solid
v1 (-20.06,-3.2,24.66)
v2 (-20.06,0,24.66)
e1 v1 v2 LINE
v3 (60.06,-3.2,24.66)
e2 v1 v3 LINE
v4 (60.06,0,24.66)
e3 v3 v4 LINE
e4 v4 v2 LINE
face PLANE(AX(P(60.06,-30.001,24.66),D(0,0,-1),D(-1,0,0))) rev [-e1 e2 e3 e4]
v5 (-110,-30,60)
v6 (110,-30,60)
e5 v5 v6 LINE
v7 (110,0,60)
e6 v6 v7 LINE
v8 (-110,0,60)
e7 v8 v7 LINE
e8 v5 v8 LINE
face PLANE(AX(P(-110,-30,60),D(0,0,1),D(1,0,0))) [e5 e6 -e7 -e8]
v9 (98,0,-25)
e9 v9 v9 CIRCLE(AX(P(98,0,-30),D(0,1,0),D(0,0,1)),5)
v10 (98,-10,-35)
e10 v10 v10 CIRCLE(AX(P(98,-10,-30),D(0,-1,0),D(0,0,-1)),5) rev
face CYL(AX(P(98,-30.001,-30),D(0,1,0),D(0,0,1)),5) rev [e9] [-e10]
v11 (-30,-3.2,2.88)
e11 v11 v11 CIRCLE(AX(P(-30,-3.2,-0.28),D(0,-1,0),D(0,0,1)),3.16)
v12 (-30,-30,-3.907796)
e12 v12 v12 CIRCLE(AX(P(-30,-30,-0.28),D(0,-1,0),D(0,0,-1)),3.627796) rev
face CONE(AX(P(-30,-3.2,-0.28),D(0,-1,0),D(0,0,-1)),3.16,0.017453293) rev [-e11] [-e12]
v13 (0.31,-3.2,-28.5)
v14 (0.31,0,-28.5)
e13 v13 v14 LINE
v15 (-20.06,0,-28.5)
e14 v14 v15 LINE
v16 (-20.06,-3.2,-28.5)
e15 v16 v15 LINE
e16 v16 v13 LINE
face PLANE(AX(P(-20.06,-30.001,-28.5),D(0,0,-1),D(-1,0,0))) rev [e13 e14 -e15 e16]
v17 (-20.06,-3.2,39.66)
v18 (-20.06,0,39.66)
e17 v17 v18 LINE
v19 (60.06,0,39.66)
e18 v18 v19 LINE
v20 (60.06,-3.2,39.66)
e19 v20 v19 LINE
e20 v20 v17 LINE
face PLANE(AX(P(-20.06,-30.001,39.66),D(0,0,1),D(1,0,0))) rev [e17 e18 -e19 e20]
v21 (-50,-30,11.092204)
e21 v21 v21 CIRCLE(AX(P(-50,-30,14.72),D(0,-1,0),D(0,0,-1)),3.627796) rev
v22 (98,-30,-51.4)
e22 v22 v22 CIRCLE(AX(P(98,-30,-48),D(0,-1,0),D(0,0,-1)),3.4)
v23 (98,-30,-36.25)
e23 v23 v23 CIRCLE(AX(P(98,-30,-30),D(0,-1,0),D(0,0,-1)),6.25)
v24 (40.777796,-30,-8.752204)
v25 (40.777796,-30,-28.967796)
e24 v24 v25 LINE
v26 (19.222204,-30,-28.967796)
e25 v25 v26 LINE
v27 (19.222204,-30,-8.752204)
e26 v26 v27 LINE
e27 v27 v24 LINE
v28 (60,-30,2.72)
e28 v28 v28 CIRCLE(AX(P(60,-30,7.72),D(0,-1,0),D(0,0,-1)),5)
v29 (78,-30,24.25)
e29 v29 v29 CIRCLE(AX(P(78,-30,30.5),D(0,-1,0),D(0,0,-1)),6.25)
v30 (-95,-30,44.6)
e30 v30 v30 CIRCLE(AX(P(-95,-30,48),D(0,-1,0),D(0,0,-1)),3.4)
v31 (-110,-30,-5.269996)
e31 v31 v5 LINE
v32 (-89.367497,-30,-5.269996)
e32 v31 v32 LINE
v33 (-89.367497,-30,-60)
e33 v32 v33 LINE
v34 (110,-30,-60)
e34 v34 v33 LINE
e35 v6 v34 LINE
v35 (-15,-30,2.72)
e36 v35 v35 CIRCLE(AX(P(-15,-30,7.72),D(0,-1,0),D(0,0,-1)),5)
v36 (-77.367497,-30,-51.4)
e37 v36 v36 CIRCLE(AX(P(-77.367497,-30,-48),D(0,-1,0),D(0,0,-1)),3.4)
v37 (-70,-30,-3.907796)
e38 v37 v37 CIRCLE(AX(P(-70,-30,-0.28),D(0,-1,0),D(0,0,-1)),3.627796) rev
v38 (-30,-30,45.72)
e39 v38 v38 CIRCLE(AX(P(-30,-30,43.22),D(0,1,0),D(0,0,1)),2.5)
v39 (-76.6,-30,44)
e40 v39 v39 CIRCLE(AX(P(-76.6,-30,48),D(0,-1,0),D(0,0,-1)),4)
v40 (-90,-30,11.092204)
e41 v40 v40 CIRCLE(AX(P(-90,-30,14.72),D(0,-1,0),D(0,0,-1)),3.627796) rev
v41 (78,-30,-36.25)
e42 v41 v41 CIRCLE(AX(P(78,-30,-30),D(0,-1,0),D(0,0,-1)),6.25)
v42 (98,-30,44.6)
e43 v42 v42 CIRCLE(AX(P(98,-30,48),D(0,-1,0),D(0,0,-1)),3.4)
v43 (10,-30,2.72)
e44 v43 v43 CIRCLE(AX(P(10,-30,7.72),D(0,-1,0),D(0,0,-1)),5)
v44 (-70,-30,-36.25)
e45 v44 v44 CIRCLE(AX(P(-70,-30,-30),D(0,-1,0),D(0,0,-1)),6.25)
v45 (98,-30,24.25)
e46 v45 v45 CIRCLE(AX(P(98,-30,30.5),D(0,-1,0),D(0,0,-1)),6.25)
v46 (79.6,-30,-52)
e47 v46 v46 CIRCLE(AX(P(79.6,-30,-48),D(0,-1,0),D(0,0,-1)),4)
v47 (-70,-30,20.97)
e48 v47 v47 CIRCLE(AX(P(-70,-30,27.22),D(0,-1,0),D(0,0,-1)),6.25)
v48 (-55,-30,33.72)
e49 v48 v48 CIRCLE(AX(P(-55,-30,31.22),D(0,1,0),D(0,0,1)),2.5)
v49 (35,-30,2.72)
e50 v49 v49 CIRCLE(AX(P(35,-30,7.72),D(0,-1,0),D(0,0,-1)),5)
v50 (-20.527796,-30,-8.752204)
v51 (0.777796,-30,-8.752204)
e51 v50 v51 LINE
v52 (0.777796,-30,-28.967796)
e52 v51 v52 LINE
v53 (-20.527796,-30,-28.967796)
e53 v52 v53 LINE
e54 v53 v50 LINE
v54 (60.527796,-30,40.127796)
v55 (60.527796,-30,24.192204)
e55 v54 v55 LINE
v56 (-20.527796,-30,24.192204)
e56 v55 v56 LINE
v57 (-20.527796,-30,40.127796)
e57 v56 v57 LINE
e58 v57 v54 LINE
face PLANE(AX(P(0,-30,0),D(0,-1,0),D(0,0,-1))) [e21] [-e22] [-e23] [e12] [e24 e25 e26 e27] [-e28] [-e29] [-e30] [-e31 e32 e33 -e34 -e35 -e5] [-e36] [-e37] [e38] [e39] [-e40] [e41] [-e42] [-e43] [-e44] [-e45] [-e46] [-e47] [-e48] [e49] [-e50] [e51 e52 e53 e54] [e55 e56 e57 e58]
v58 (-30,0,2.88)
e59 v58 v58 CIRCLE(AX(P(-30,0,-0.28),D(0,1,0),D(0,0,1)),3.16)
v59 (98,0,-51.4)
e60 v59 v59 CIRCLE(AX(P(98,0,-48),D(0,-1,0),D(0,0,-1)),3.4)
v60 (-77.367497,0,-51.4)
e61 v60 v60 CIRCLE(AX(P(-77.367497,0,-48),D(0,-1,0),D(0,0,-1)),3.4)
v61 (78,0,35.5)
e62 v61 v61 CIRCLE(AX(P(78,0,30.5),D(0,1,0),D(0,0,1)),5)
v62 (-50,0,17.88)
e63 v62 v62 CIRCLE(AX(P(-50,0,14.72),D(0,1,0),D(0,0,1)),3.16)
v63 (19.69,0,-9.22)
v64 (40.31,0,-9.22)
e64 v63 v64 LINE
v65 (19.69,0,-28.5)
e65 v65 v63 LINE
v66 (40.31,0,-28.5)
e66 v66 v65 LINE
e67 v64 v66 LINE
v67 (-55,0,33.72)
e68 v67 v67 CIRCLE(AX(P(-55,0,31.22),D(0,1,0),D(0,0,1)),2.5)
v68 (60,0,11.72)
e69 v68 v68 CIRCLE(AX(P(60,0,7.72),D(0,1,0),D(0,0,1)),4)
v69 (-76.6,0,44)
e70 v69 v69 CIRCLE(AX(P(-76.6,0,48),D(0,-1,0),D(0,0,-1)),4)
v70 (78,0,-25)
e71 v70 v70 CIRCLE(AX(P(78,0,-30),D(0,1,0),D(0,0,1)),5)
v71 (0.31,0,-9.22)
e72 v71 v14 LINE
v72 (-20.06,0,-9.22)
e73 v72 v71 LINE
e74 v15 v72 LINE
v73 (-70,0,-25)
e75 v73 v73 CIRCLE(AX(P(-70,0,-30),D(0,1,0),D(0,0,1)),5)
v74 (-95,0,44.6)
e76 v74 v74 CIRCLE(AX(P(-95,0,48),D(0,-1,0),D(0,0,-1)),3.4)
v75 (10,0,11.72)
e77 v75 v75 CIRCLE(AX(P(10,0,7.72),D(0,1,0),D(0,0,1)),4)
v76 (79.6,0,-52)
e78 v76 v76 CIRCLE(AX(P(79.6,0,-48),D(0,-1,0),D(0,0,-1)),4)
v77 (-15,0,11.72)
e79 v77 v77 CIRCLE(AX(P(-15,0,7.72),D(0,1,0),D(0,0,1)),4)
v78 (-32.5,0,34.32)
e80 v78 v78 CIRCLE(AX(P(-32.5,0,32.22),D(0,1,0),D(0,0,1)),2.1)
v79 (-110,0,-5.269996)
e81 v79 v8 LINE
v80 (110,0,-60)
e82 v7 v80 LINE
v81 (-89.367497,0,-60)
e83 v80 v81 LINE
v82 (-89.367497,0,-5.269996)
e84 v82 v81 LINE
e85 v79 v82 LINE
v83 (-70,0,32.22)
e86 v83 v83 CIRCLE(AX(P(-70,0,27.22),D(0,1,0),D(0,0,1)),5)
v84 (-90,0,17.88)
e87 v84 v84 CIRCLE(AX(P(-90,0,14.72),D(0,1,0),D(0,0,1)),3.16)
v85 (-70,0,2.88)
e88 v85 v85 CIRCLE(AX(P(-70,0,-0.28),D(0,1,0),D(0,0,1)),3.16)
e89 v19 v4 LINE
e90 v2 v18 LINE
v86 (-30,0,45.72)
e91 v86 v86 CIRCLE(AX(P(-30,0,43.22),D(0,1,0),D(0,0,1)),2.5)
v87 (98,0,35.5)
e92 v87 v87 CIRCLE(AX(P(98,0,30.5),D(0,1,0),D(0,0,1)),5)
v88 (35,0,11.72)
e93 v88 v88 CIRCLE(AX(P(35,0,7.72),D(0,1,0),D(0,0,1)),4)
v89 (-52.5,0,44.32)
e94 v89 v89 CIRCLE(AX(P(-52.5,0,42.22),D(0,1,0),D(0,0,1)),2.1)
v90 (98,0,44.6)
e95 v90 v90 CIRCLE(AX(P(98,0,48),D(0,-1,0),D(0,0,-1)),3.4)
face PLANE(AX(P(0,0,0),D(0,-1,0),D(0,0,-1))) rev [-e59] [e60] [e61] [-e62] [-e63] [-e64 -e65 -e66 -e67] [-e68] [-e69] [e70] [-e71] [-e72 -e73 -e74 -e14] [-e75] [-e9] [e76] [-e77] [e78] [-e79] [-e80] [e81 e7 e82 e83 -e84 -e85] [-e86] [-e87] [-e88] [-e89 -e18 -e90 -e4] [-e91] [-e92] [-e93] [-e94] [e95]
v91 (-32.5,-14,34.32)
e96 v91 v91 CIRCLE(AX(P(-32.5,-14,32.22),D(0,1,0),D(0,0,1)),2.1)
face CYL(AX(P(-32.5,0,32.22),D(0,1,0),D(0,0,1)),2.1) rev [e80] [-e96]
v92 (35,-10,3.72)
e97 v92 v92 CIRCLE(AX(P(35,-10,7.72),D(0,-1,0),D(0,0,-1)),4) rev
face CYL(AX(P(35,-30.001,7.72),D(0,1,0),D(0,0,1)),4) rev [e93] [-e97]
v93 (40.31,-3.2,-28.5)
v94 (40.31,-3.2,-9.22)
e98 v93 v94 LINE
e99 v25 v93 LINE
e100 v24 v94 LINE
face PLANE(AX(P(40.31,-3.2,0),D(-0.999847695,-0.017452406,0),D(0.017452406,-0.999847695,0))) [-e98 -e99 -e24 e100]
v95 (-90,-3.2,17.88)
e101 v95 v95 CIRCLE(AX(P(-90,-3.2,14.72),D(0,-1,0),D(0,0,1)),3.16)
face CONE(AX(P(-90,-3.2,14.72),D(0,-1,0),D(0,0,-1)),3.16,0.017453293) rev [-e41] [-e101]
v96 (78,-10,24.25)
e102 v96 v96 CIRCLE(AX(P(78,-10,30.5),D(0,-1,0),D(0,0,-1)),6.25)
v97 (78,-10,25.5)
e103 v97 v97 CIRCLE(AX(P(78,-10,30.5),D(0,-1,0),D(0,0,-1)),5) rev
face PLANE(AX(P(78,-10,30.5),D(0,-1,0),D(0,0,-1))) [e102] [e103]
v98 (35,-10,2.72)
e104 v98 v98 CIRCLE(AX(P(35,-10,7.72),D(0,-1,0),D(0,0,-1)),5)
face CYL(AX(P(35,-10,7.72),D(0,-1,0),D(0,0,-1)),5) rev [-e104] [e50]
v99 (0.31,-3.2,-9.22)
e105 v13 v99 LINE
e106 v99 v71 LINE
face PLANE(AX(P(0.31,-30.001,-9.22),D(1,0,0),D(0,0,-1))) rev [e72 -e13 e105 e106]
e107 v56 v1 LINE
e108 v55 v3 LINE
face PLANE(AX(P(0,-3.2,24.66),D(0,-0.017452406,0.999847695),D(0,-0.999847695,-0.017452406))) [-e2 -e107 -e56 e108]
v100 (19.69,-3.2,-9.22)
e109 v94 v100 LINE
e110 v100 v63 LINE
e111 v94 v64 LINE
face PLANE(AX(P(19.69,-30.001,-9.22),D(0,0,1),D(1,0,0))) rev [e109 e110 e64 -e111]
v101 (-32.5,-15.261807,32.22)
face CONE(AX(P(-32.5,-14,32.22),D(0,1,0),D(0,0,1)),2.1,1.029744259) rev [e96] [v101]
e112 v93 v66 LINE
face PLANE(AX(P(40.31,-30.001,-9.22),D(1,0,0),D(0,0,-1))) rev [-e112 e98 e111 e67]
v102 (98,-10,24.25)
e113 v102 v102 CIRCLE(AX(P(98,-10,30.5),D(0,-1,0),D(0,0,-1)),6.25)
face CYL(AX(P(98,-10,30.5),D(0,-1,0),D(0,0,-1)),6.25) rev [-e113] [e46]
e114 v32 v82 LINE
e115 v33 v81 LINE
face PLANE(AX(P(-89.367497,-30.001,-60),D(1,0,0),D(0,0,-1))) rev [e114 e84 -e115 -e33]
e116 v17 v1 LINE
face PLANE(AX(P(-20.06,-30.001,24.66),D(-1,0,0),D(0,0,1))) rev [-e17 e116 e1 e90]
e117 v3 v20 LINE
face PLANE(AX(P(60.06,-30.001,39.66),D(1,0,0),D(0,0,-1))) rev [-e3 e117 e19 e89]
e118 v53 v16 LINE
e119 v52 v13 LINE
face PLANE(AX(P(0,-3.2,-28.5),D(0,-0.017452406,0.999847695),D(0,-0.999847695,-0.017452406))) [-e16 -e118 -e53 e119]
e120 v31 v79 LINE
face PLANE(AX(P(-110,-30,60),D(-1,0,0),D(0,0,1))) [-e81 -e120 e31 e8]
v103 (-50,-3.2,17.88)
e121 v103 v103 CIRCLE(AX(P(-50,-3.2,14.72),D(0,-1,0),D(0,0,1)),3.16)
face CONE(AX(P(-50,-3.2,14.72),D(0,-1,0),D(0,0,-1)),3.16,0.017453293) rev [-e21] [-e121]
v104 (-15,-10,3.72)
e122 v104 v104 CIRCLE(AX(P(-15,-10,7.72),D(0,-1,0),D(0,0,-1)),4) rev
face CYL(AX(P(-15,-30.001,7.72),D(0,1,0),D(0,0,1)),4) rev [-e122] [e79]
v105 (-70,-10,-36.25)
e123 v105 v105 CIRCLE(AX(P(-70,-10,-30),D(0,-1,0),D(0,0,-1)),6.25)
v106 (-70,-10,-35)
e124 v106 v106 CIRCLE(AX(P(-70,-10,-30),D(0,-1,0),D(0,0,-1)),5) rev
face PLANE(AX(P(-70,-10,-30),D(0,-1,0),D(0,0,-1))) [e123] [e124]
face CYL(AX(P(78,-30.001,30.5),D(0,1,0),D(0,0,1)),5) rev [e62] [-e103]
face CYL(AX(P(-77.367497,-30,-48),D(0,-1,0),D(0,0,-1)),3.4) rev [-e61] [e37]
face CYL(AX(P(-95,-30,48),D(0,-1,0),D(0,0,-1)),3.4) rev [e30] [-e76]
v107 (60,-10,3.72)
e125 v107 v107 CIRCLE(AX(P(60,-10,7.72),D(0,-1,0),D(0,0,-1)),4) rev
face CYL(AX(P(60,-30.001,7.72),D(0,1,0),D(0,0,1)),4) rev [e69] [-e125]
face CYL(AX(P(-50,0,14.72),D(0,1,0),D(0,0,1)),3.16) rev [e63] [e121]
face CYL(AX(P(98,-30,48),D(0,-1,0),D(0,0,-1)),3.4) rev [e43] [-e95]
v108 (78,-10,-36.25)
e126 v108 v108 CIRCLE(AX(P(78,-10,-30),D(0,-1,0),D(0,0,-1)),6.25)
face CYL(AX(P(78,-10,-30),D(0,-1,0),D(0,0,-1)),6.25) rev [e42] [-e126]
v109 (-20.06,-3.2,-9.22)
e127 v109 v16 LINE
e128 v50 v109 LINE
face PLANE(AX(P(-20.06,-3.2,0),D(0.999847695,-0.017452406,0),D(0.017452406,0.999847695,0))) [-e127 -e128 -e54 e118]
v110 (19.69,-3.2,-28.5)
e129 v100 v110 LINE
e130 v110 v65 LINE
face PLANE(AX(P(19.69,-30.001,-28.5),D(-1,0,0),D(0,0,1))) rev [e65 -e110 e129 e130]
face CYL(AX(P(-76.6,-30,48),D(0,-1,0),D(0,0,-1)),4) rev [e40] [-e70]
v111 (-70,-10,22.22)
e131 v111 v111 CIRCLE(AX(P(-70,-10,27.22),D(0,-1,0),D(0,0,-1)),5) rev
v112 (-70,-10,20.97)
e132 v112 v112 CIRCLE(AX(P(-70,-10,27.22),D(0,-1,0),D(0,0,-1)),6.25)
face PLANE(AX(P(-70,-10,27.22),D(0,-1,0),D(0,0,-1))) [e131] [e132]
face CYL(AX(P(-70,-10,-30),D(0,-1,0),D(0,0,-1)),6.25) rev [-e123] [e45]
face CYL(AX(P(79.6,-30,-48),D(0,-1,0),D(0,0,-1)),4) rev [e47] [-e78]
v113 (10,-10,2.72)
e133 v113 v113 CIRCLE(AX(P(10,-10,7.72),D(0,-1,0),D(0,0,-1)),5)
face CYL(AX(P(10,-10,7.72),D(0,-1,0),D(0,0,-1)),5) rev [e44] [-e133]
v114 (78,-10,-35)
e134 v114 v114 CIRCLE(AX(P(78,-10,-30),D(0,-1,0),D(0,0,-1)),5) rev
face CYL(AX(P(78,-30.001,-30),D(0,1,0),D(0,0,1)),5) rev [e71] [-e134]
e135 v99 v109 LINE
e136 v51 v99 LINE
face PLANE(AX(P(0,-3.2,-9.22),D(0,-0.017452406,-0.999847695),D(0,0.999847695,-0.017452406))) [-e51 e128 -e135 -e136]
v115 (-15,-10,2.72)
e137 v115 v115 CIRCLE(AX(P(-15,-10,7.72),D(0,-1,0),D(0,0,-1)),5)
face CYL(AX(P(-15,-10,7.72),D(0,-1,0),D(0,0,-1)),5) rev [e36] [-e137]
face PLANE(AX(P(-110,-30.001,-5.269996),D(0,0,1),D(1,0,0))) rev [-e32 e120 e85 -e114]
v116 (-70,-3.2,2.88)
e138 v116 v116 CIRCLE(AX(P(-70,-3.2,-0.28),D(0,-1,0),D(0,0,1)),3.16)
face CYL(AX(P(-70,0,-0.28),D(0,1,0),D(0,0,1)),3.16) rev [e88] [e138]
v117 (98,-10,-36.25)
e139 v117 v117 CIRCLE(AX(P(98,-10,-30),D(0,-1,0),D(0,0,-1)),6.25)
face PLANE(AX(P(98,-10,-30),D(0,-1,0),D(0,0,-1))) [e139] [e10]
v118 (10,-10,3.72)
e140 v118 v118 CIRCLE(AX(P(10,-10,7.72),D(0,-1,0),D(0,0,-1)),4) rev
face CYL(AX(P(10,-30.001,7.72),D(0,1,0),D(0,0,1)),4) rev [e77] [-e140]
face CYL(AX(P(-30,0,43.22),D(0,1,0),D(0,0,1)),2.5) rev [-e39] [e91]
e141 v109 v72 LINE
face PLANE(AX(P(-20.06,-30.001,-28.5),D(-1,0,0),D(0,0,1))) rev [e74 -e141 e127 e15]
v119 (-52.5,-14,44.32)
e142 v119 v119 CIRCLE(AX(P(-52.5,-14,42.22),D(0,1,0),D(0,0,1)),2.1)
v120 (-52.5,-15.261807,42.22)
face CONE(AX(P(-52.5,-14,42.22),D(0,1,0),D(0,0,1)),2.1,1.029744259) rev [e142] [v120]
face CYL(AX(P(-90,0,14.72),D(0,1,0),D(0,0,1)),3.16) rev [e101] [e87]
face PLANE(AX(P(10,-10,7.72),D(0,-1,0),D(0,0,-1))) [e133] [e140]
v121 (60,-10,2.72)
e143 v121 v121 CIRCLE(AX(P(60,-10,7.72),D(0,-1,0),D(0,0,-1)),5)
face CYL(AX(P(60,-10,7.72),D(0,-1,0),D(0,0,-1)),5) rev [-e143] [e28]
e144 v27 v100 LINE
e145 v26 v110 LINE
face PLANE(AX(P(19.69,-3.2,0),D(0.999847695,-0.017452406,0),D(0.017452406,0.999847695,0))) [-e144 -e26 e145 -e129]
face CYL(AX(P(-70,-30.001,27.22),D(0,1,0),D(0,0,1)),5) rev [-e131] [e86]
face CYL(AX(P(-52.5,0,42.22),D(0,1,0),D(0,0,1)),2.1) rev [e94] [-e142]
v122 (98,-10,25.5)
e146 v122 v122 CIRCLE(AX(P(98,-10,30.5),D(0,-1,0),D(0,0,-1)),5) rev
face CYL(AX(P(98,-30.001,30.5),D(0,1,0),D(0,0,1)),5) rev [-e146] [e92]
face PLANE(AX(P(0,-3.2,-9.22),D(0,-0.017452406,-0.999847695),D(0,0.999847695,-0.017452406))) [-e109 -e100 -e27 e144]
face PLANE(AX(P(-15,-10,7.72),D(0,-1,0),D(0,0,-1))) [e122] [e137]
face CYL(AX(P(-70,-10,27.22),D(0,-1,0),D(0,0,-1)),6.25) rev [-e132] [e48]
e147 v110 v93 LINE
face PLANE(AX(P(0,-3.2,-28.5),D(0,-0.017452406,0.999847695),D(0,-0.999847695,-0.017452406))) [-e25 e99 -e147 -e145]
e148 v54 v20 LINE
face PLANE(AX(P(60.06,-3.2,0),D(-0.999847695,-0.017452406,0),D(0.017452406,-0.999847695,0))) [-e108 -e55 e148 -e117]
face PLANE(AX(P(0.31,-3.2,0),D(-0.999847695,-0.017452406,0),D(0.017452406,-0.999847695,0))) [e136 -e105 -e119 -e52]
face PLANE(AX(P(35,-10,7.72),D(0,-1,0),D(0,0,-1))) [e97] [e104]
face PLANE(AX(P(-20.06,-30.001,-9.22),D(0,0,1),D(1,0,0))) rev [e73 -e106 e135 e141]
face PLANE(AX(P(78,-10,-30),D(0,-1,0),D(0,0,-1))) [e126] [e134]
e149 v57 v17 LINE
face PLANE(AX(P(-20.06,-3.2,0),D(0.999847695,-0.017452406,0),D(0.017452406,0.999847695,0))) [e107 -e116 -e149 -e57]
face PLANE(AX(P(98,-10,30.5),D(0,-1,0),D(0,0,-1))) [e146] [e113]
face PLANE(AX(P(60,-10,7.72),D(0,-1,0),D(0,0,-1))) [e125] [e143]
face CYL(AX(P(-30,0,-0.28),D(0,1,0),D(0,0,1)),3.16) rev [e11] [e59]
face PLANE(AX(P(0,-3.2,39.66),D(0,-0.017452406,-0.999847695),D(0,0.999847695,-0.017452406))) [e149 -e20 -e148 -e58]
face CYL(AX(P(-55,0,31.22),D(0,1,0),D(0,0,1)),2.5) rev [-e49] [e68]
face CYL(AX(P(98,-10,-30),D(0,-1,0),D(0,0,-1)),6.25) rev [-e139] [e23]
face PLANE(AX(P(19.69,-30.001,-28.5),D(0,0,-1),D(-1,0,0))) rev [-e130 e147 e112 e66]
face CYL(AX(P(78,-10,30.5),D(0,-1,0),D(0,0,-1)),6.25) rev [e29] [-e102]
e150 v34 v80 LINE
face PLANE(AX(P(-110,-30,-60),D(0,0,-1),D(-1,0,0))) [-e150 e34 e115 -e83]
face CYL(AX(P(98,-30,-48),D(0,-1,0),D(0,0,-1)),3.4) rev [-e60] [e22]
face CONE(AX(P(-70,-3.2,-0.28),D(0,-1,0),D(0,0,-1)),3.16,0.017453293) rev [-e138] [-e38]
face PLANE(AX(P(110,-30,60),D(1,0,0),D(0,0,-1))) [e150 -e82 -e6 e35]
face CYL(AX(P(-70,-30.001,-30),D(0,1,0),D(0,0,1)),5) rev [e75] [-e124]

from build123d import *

# Parameters (mm, degrees)
SKETCH1_W                    = 220
SKETCH1_H                    = 120
BOSS_EXTRUDE1_DEPTH          = 30
CUT_EXTRUDE1_REACH           = 130.841
SKETCH2_W                    = 20.632503002
SKETCH2_H                    = 54.730004003
CUT_EXTRUDE3_REACH           = 130.841
SKETCH5_W                    = 20.37
SKETCH5_H                    = 19.28
SKETCH5_W_2                  = 20.62
F_0_15_6_32_DIAMETER_HOLE1_D = 6.32
CUT_EXTRUDE4_REACH           = 130.841
SKETCH10_W                   = 80.12
SKETCH10_H                   = 15
CUT_EXTRUDE5_REACH           = 130.841
SKETCH12_R                   = 5
SKETCH12_R_2                 = 4
SKETCH13_R                   = 6.25
CUT_EXTRUDE6_DEPTH           = 20
SKETCH14_R                   = 5
CUT_EXTRUDE7_DEPTH           = 20
M5_TAPPED_HOLE1_D            = 4.2
M5_TAPPED_HOLE1_DEPTH        = 14
M5_TAPPED_HOLE1_TIP          = 1.2618073
F_5_0MM_DOWEL_HOLE1_D        = 5
M8_TAPPED_HOLE1_D            = 6.8
F_8_0MM_DOWEL_HOLE1_D        = 8


with BuildPart() as part:
    # Sketch1 → Boss-Extrude1 (new body)
    with BuildSketch(Plane(origin=(0, 0, 0), x_dir=(1, 0, 0), z_dir=(0, 1, 0))):
        Rectangle(SKETCH1_W, SKETCH1_H)
    extrude(amount=-BOSS_EXTRUDE1_DEPTH)

    # Sketch2 → Cut-Extrude1 (cut, up to next)
    with BuildSketch(Plane(origin=(0, 0, 0), x_dir=(1, 0, 0), z_dir=(0, 1, 0)), mode=Mode.PRIVATE) as cut_extrude1_sk1:
        with Locations((-99.683748499, 32.634997999)):
            Rectangle(SKETCH2_W, SKETCH2_H)
    cut_extrude1_tool1 = extrude(cut_extrude1_sk1.sketch, amount=-CUT_EXTRUDE1_REACH, mode=Mode.PRIVATE) & part.part
    add(cut_extrude1_tool1.solids().sort_by_distance((-99.683748, 0, -32.634998))[0], mode=Mode.SUBTRACT)

    # Sketch5 → Cut-Extrude3 (cut, up to next)
    with BuildSketch(Plane(origin=(0, 0, 0), x_dir=(1, 0, 0), z_dir=(0, 1, 0)), mode=Mode.PRIVATE) as cut_extrude3_sk1:
        with Locations((-9.875, 18.86)):
            Rectangle(SKETCH5_W, SKETCH5_H)
    cut_extrude3_tool1 = extrude(cut_extrude3_sk1.sketch, amount=-CUT_EXTRUDE3_REACH, mode=Mode.PRIVATE) & part.part
    # Sketch5 → Cut-Extrude3 (cut, up to next)
    with BuildSketch(Plane(origin=(0, 0, 0), x_dir=(1, 0, 0), z_dir=(0, 1, 0)), mode=Mode.PRIVATE) as cut_extrude3_sk2:
        with Locations((30, 18.86)):
            Rectangle(SKETCH5_W_2, SKETCH5_H)
    cut_extrude3_tool2 = extrude(cut_extrude3_sk2.sketch, amount=-CUT_EXTRUDE3_REACH, mode=Mode.PRIVATE) & part.part
    add(cut_extrude3_tool1.solids().sort_by_distance((-9.875, 0, -18.86))[0], mode=Mode.SUBTRACT)
    add(cut_extrude3_tool2.solids().sort_by_distance((30, 0, -18.86))[0], mode=Mode.SUBTRACT)

    # Ø0.15 (6.32) Diameter Hole1 (through all)
    with Locations(Plane(origin=(0, 0, 0), x_dir=(1, 0, 0), z_dir=(0, 1, 0))):
        with Locations((-30, 0.28), (-50, -14.72), (-70, 0.28), (-90, -14.72)):
            Hole(F_0_15_6_32_DIAMETER_HOLE1_D / 2)

    # Sketch10 → Cut-Extrude4 (cut, up to next)
    with BuildSketch(Plane(origin=(0, 0, 0), x_dir=(1, 0, 0), z_dir=(0, 1, 0)), mode=Mode.PRIVATE) as cut_extrude4_sk1:
        with Locations((20, -32.16)):
            Rectangle(SKETCH10_W, SKETCH10_H)
    cut_extrude4_tool1 = extrude(cut_extrude4_sk1.sketch, amount=-CUT_EXTRUDE4_REACH, mode=Mode.PRIVATE) & part.part
    add(cut_extrude4_tool1.solids().sort_by_distance((20, 0, 32.16))[0], mode=Mode.SUBTRACT)

    # Draft1: read off the stored shape, not the designer's step
    # Draft1: loft between two sections, ruled curve by curve
    draft1_from = [
        Edge.make_line((40.31, -3.2, -9.22), (40.31, -3.2, -28.5)),
        Edge.make_line((19.69, -3.2, -9.22), (40.31, -3.2, -9.22)),
        Edge.make_line((19.69, -3.2, -28.5), (19.69, -3.2, -9.22)),
        Edge.make_line((40.31, -3.2, -28.5), (19.69, -3.2, -28.5)),
    ]
    draft1_to = [
        Edge.make_line((40.77779574, -30, -8.75220426), (40.77779574, -30, -28.96779574)),
        Edge.make_line((19.22220426, -30, -8.75220426), (40.77779574, -30, -8.75220426)),
        Edge.make_line((19.22220426, -30, -28.96779574), (19.22220426, -30, -8.75220426)),
        Edge.make_line((40.77779574, -30, -28.96779574), (19.22220426, -30, -28.96779574)),
    ]
    draft1 = Solid(Shell([*[Face.make_surface_from_curves(draft1_from[k], draft1_to[k]) for k in range(4)], Face(Wire(draft1_from)), Face(Wire(draft1_to))]))
    add(draft1, mode=Mode.SUBTRACT)

    # Draft1 2: loft between two sections, ruled curve by curve
    draft1_2_from = [
        Edge.make_line((-20.06, -3.2, -9.22), (0.31, -3.2, -9.22)),
        Edge.make_line((0.31, -3.2, -28.5), (-20.06, -3.2, -28.5)),
        Edge.make_line((0.31, -3.2, -9.22), (0.31, -3.2, -28.5)),
        Edge.make_line((-20.06, -3.2, -28.5), (-20.06, -3.2, -9.22)),
    ]
    draft1_2_to = [
        Edge.make_line((-20.52779574, -30, -8.75220426), (0.77779574, -30, -8.75220426)),
        Edge.make_line((0.77779574, -30, -28.96779574), (-20.52779574, -30, -28.96779574)),
        Edge.make_line((0.77779574, -30, -8.75220426), (0.77779574, -30, -28.96779574)),
        Edge.make_line((-20.52779574, -30, -28.96779574), (-20.52779574, -30, -8.75220426)),
    ]
    draft1_2 = Solid(Shell([*[Face.make_surface_from_curves(draft1_2_from[k], draft1_2_to[k]) for k in range(4)], Face(Wire(draft1_2_from)), Face(Wire(draft1_2_to))]))
    add(draft1_2, mode=Mode.SUBTRACT)

    # Draft1 3: loft between two sections, ruled curve by curve
    draft1_3_from = [
        Edge.make_line((-20.06, -3.2, 24.66), (-20.06, -3.2, 39.66)),
        Edge.make_line((60.06, -3.2, 24.66), (-20.06, -3.2, 24.66)),
        Edge.make_line((60.06, -3.2, 39.66), (60.06, -3.2, 24.66)),
        Edge.make_line((-20.06, -3.2, 39.66), (60.06, -3.2, 39.66)),
    ]
    draft1_3_to = [
        Edge.make_line((-20.52779574, -30, 24.19220426), (-20.52779574, -30, 40.12779574)),
        Edge.make_line((60.52779574, -30, 24.19220426), (-20.52779574, -30, 24.19220426)),
        Edge.make_line((60.52779574, -30, 40.12779574), (60.52779574, -30, 24.19220426)),
        Edge.make_line((-20.52779574, -30, 40.12779574), (60.52779574, -30, 40.12779574)),
    ]
    draft1_3 = Solid(Shell([*[Face.make_surface_from_curves(draft1_3_from[k], draft1_3_to[k]) for k in range(4)], Face(Wire(draft1_3_from)), Face(Wire(draft1_3_to))]))
    add(draft1_3, mode=Mode.SUBTRACT)

    # Draft2: read off the stored shape, not the designer's step
    # Draft2: loft between two sections, ruled curve by curve
    draft2_from = [
        Edge.make_three_point_arc((-90, -3.2, 11.56), (-86.84, -3.2, 14.72), (-90, -3.2, 17.88)),
        Edge.make_three_point_arc((-90, -3.2, 17.88), (-93.16, -3.2, 14.72), (-90, -3.2, 11.56)),
    ]
    draft2_to = [
        Edge.make_three_point_arc((-90, -30, 11.09220426), (-86.37220426, -30, 14.72), (-90, -30, 18.34779574)),
        Edge.make_three_point_arc((-90, -30, 18.34779574), (-93.62779574, -30, 14.72), (-90, -30, 11.09220426)),
    ]
    draft2 = Solid(Shell([*[Face.make_surface_from_curves(draft2_from[k], draft2_to[k]) for k in range(2)], Face(Wire(draft2_from)), Face(Wire(draft2_to))]))
    add(draft2, mode=Mode.SUBTRACT)

    # Draft2 2: loft between two sections, ruled curve by curve
    draft2_2_from = [
        Edge.make_three_point_arc((-70, -3.2, -3.44), (-66.84, -3.2, -0.28), (-70, -3.2, 2.88)),
        Edge.make_three_point_arc((-70, -3.2, 2.88), (-73.16, -3.2, -0.28), (-70, -3.2, -3.44)),
    ]
    draft2_2_to = [
        Edge.make_three_point_arc((-70, -30, -3.90779574), (-66.37220426, -30, -0.28), (-70, -30, 3.34779574)),
        Edge.make_three_point_arc((-70, -30, 3.34779574), (-73.62779574, -30, -0.28), (-70, -30, -3.90779574)),
    ]
    draft2_2 = Solid(Shell([*[Face.make_surface_from_curves(draft2_2_from[k], draft2_2_to[k]) for k in range(2)], Face(Wire(draft2_2_from)), Face(Wire(draft2_2_to))]))
    add(draft2_2, mode=Mode.SUBTRACT)

    # Draft2 3: loft between two sections, ruled curve by curve
    draft2_3_from = [
        Edge.make_three_point_arc((-50, -3.2, 11.56), (-46.84, -3.2, 14.72), (-50, -3.2, 17.88)),
        Edge.make_three_point_arc((-50, -3.2, 17.88), (-53.16, -3.2, 14.72), (-50, -3.2, 11.56)),
    ]
    draft2_3_to = [
        Edge.make_three_point_arc((-50, -30, 11.09220426), (-46.37220426, -30, 14.72), (-50, -30, 18.34779574)),
        Edge.make_three_point_arc((-50, -30, 18.34779574), (-53.62779574, -30, 14.72), (-50, -30, 11.09220426)),
    ]
    draft2_3 = Solid(Shell([*[Face.make_surface_from_curves(draft2_3_from[k], draft2_3_to[k]) for k in range(2)], Face(Wire(draft2_3_from)), Face(Wire(draft2_3_to))]))
    add(draft2_3, mode=Mode.SUBTRACT)

    # Draft2 4: loft between two sections, ruled curve by curve
    draft2_4_from = [
        Edge.make_three_point_arc((-30, -3.2, -3.44), (-26.84, -3.2, -0.28), (-30, -3.2, 2.88)),
        Edge.make_three_point_arc((-30, -3.2, 2.88), (-33.16, -3.2, -0.28), (-30, -3.2, -3.44)),
    ]
    draft2_4_to = [
        Edge.make_three_point_arc((-30, -30, -3.90779574), (-26.37220426, -30, -0.28), (-30, -30, 3.34779574)),
        Edge.make_three_point_arc((-30, -30, 3.34779574), (-33.62779574, -30, -0.28), (-30, -30, -3.90779574)),
    ]
    draft2_4 = Solid(Shell([*[Face.make_surface_from_curves(draft2_4_from[k], draft2_4_to[k]) for k in range(2)], Face(Wire(draft2_4_from)), Face(Wire(draft2_4_to))]))
    add(draft2_4, mode=Mode.SUBTRACT)

    # Sketch12 → Cut-Extrude5 (cut, up to next)
    with BuildSketch(Plane(origin=(0, 0, 0), x_dir=(1, 0, 0), z_dir=(0, 1, 0)), mode=Mode.PRIVATE) as cut_extrude5_sk1:
        with Locations(Location((-70, 30, 0), (0, 0, 270))):
            Circle(SKETCH12_R)
    cut_extrude5_tool1 = extrude(cut_extrude5_sk1.sketch, amount=-CUT_EXTRUDE5_REACH, mode=Mode.PRIVATE) & part.part
    # Sketch12 → Cut-Extrude5 (cut, up to next)
    with BuildSketch(Plane(origin=(0, 0, 0), x_dir=(1, 0, 0), z_dir=(0, 1, 0)), mode=Mode.PRIVATE) as cut_extrude5_sk2:
        with Locations(Location((98, -30.5, 0), (0, 0, 270))):
            Circle(SKETCH12_R)
    cut_extrude5_tool2 = extrude(cut_extrude5_sk2.sketch, amount=-CUT_EXTRUDE5_REACH, mode=Mode.PRIVATE) & part.part
    # Sketch12 → Cut-Extrude5 (cut, up to next)
    with BuildSketch(Plane(origin=(0, 0, 0), x_dir=(1, 0, 0), z_dir=(0, 1, 0)), mode=Mode.PRIVATE) as cut_extrude5_sk3:
        with Locations(Location((98, 30, 0), (0, 0, 270))):
            Circle(SKETCH12_R)
    cut_extrude5_tool3 = extrude(cut_extrude5_sk3.sketch, amount=-CUT_EXTRUDE5_REACH, mode=Mode.PRIVATE) & part.part
    # Sketch12 → Cut-Extrude5 (cut, up to next)
    with BuildSketch(Plane(origin=(0, 0, 0), x_dir=(1, 0, 0), z_dir=(0, 1, 0)), mode=Mode.PRIVATE) as cut_extrude5_sk4:
        with Locations(Location((78, 30, 0), (0, 0, 270))):
            Circle(SKETCH12_R)
    cut_extrude5_tool4 = extrude(cut_extrude5_sk4.sketch, amount=-CUT_EXTRUDE5_REACH, mode=Mode.PRIVATE) & part.part
    # Sketch12 → Cut-Extrude5 (cut, up to next)
    with BuildSketch(Plane(origin=(0, 0, 0), x_dir=(1, 0, 0), z_dir=(0, 1, 0)), mode=Mode.PRIVATE) as cut_extrude5_sk5:
        with Locations(Location((10, -7.72, 0), (0, 0, 270))):
            Circle(SKETCH12_R_2)
    cut_extrude5_tool5 = extrude(cut_extrude5_sk5.sketch, amount=-CUT_EXTRUDE5_REACH, mode=Mode.PRIVATE) & part.part
    # Sketch12 → Cut-Extrude5 (cut, up to next)
    with BuildSketch(Plane(origin=(0, 0, 0), x_dir=(1, 0, 0), z_dir=(0, 1, 0)), mode=Mode.PRIVATE) as cut_extrude5_sk6:
        with Locations(Location((35, -7.72, 0), (0, 0, 270))):
            Circle(SKETCH12_R_2)
    cut_extrude5_tool6 = extrude(cut_extrude5_sk6.sketch, amount=-CUT_EXTRUDE5_REACH, mode=Mode.PRIVATE) & part.part
    # Sketch12 → Cut-Extrude5 (cut, up to next)
    with BuildSketch(Plane(origin=(0, 0, 0), x_dir=(1, 0, 0), z_dir=(0, 1, 0)), mode=Mode.PRIVATE) as cut_extrude5_sk7:
        with Locations(Location((60, -7.72, 0), (0, 0, 270))):
            Circle(SKETCH12_R_2)
    cut_extrude5_tool7 = extrude(cut_extrude5_sk7.sketch, amount=-CUT_EXTRUDE5_REACH, mode=Mode.PRIVATE) & part.part
    # Sketch12 → Cut-Extrude5 (cut, up to next)
    with BuildSketch(Plane(origin=(0, 0, 0), x_dir=(1, 0, 0), z_dir=(0, 1, 0)), mode=Mode.PRIVATE) as cut_extrude5_sk8:
        with Locations(Location((-70, -27.22, 0), (0, 0, 270))):
            Circle(SKETCH12_R)
    cut_extrude5_tool8 = extrude(cut_extrude5_sk8.sketch, amount=-CUT_EXTRUDE5_REACH, mode=Mode.PRIVATE) & part.part
    # Sketch12 → Cut-Extrude5 (cut, up to next)
    with BuildSketch(Plane(origin=(0, 0, 0), x_dir=(1, 0, 0), z_dir=(0, 1, 0)), mode=Mode.PRIVATE) as cut_extrude5_sk9:
        with Locations(Location((78, -30.5, 0), (0, 0, 270))):
            Circle(SKETCH12_R)
    cut_extrude5_tool9 = extrude(cut_extrude5_sk9.sketch, amount=-CUT_EXTRUDE5_REACH, mode=Mode.PRIVATE) & part.part
    # Sketch12 → Cut-Extrude5 (cut, up to next)
    with BuildSketch(Plane(origin=(0, 0, 0), x_dir=(1, 0, 0), z_dir=(0, 1, 0)), mode=Mode.PRIVATE) as cut_extrude5_sk10:
        with Locations(Location((-15, -7.72, 0), (0, 0, 270))):
            Circle(SKETCH12_R_2)
    cut_extrude5_tool10 = extrude(cut_extrude5_sk10.sketch, amount=-CUT_EXTRUDE5_REACH, mode=Mode.PRIVATE) & part.part
    add(cut_extrude5_tool1.solids().sort_by_distance((-70, 0, -30))[0], mode=Mode.SUBTRACT)
    add(cut_extrude5_tool2.solids().sort_by_distance((98, 0, 30.5))[0], mode=Mode.SUBTRACT)
    add(cut_extrude5_tool3.solids().sort_by_distance((98, 0, -30))[0], mode=Mode.SUBTRACT)
    add(cut_extrude5_tool4.solids().sort_by_distance((78, 0, -30))[0], mode=Mode.SUBTRACT)
    add(cut_extrude5_tool5.solids().sort_by_distance((10, 0, 7.72))[0], mode=Mode.SUBTRACT)
    add(cut_extrude5_tool6.solids().sort_by_distance((35, 0, 7.72))[0], mode=Mode.SUBTRACT)
    add(cut_extrude5_tool7.solids().sort_by_distance((60, 0, 7.72))[0], mode=Mode.SUBTRACT)
    add(cut_extrude5_tool8.solids().sort_by_distance((-70, 0, 27.22))[0], mode=Mode.SUBTRACT)
    add(cut_extrude5_tool9.solids().sort_by_distance((78, 0, 30.5))[0], mode=Mode.SUBTRACT)
    add(cut_extrude5_tool10.solids().sort_by_distance((-15, 0, 7.72))[0], mode=Mode.SUBTRACT)

    # Sketch13 → Cut-Extrude6 (cut)
    with BuildSketch(Plane.XZ.offset(30)):
        with Locations(Location((-70, 27.22, 0), (0, 0, 270))):
            Circle(SKETCH13_R)
        with Locations(Location((78, 30.5, 0), (0, 0, 270))):
            Circle(SKETCH13_R)
        with Locations(Location((98, 30.5, 0), (0, 0, 270))):
            Circle(SKETCH13_R)
        with Locations(Location((98, -30, 0), (0, 0, 270))):
            Circle(SKETCH13_R)
        with Locations(Location((78, -30, 0), (0, 0, 270))):
            Circle(SKETCH13_R)
        with Locations(Location((-70, -30, 0), (0, 0, 270))):
            Circle(SKETCH13_R)
    extrude(amount=-CUT_EXTRUDE6_DEPTH, mode=Mode.SUBTRACT)

    # Sketch14 → Cut-Extrude7 (cut)
    with BuildSketch(Plane.XZ.offset(30)):
        with Locations(Location((-15, 7.72, 0), (0, 0, 270))):
            Circle(SKETCH14_R)
        with Locations(Location((10, 7.72, 0), (0, 0, 270))):
            Circle(SKETCH14_R)
        with Locations(Location((35, 7.72, 0), (0, 0, 270))):
            Circle(SKETCH14_R)
        with Locations(Location((60, 7.72, 0), (0, 0, 270))):
            Circle(SKETCH14_R)
    extrude(amount=-CUT_EXTRUDE7_DEPTH, mode=Mode.SUBTRACT)

    # M5 Tapped Hole1
    with Locations(Plane(origin=(0, 0, 0), x_dir=(1, 0, 0), z_dir=(0, 1, 0))):
        with Locations((-52.5, -42.22), (-32.5, -32.22)):
            Hole(M5_TAPPED_HOLE1_D / 2, depth=M5_TAPPED_HOLE1_DEPTH)
            with Locations((0, 0, -(M5_TAPPED_HOLE1_DEPTH + M5_TAPPED_HOLE1_TIP / 2))):  # 118° drill point
                Cone(0, M5_TAPPED_HOLE1_D / 2, M5_TAPPED_HOLE1_TIP, mode=Mode.SUBTRACT)

    # Ø5.0mm Dowel Hole1 (through all)
    with Locations(Plane(origin=(0, 0, 0), x_dir=(1, 0, 0), z_dir=(0, 1, 0))):
        with Locations((-30, -43.22), (-55, -31.22)):
            Hole(F_5_0MM_DOWEL_HOLE1_D / 2)

    # M8 Tapped Hole1 (through all)
    with Locations(Plane(origin=(0, -30, 0), x_dir=(-1, 0, 0), z_dir=(0, -1, 0))):
        with Locations((-98, 48), (-98, -48), (95, -48), (77.367496998, 48)):
            Hole(M8_TAPPED_HOLE1_D / 2)

    # Ø8.0mm Dowel Hole1 (through all)
    with Locations(Plane(origin=(0, -30, 0), x_dir=(-1, 0, 0), z_dir=(0, -1, 0))):
        with Locations((-79.6, 48), (76.6, -48)):
            Hole(F_8_0MM_DOWEL_HOLE1_D / 2)


solid = part.part
